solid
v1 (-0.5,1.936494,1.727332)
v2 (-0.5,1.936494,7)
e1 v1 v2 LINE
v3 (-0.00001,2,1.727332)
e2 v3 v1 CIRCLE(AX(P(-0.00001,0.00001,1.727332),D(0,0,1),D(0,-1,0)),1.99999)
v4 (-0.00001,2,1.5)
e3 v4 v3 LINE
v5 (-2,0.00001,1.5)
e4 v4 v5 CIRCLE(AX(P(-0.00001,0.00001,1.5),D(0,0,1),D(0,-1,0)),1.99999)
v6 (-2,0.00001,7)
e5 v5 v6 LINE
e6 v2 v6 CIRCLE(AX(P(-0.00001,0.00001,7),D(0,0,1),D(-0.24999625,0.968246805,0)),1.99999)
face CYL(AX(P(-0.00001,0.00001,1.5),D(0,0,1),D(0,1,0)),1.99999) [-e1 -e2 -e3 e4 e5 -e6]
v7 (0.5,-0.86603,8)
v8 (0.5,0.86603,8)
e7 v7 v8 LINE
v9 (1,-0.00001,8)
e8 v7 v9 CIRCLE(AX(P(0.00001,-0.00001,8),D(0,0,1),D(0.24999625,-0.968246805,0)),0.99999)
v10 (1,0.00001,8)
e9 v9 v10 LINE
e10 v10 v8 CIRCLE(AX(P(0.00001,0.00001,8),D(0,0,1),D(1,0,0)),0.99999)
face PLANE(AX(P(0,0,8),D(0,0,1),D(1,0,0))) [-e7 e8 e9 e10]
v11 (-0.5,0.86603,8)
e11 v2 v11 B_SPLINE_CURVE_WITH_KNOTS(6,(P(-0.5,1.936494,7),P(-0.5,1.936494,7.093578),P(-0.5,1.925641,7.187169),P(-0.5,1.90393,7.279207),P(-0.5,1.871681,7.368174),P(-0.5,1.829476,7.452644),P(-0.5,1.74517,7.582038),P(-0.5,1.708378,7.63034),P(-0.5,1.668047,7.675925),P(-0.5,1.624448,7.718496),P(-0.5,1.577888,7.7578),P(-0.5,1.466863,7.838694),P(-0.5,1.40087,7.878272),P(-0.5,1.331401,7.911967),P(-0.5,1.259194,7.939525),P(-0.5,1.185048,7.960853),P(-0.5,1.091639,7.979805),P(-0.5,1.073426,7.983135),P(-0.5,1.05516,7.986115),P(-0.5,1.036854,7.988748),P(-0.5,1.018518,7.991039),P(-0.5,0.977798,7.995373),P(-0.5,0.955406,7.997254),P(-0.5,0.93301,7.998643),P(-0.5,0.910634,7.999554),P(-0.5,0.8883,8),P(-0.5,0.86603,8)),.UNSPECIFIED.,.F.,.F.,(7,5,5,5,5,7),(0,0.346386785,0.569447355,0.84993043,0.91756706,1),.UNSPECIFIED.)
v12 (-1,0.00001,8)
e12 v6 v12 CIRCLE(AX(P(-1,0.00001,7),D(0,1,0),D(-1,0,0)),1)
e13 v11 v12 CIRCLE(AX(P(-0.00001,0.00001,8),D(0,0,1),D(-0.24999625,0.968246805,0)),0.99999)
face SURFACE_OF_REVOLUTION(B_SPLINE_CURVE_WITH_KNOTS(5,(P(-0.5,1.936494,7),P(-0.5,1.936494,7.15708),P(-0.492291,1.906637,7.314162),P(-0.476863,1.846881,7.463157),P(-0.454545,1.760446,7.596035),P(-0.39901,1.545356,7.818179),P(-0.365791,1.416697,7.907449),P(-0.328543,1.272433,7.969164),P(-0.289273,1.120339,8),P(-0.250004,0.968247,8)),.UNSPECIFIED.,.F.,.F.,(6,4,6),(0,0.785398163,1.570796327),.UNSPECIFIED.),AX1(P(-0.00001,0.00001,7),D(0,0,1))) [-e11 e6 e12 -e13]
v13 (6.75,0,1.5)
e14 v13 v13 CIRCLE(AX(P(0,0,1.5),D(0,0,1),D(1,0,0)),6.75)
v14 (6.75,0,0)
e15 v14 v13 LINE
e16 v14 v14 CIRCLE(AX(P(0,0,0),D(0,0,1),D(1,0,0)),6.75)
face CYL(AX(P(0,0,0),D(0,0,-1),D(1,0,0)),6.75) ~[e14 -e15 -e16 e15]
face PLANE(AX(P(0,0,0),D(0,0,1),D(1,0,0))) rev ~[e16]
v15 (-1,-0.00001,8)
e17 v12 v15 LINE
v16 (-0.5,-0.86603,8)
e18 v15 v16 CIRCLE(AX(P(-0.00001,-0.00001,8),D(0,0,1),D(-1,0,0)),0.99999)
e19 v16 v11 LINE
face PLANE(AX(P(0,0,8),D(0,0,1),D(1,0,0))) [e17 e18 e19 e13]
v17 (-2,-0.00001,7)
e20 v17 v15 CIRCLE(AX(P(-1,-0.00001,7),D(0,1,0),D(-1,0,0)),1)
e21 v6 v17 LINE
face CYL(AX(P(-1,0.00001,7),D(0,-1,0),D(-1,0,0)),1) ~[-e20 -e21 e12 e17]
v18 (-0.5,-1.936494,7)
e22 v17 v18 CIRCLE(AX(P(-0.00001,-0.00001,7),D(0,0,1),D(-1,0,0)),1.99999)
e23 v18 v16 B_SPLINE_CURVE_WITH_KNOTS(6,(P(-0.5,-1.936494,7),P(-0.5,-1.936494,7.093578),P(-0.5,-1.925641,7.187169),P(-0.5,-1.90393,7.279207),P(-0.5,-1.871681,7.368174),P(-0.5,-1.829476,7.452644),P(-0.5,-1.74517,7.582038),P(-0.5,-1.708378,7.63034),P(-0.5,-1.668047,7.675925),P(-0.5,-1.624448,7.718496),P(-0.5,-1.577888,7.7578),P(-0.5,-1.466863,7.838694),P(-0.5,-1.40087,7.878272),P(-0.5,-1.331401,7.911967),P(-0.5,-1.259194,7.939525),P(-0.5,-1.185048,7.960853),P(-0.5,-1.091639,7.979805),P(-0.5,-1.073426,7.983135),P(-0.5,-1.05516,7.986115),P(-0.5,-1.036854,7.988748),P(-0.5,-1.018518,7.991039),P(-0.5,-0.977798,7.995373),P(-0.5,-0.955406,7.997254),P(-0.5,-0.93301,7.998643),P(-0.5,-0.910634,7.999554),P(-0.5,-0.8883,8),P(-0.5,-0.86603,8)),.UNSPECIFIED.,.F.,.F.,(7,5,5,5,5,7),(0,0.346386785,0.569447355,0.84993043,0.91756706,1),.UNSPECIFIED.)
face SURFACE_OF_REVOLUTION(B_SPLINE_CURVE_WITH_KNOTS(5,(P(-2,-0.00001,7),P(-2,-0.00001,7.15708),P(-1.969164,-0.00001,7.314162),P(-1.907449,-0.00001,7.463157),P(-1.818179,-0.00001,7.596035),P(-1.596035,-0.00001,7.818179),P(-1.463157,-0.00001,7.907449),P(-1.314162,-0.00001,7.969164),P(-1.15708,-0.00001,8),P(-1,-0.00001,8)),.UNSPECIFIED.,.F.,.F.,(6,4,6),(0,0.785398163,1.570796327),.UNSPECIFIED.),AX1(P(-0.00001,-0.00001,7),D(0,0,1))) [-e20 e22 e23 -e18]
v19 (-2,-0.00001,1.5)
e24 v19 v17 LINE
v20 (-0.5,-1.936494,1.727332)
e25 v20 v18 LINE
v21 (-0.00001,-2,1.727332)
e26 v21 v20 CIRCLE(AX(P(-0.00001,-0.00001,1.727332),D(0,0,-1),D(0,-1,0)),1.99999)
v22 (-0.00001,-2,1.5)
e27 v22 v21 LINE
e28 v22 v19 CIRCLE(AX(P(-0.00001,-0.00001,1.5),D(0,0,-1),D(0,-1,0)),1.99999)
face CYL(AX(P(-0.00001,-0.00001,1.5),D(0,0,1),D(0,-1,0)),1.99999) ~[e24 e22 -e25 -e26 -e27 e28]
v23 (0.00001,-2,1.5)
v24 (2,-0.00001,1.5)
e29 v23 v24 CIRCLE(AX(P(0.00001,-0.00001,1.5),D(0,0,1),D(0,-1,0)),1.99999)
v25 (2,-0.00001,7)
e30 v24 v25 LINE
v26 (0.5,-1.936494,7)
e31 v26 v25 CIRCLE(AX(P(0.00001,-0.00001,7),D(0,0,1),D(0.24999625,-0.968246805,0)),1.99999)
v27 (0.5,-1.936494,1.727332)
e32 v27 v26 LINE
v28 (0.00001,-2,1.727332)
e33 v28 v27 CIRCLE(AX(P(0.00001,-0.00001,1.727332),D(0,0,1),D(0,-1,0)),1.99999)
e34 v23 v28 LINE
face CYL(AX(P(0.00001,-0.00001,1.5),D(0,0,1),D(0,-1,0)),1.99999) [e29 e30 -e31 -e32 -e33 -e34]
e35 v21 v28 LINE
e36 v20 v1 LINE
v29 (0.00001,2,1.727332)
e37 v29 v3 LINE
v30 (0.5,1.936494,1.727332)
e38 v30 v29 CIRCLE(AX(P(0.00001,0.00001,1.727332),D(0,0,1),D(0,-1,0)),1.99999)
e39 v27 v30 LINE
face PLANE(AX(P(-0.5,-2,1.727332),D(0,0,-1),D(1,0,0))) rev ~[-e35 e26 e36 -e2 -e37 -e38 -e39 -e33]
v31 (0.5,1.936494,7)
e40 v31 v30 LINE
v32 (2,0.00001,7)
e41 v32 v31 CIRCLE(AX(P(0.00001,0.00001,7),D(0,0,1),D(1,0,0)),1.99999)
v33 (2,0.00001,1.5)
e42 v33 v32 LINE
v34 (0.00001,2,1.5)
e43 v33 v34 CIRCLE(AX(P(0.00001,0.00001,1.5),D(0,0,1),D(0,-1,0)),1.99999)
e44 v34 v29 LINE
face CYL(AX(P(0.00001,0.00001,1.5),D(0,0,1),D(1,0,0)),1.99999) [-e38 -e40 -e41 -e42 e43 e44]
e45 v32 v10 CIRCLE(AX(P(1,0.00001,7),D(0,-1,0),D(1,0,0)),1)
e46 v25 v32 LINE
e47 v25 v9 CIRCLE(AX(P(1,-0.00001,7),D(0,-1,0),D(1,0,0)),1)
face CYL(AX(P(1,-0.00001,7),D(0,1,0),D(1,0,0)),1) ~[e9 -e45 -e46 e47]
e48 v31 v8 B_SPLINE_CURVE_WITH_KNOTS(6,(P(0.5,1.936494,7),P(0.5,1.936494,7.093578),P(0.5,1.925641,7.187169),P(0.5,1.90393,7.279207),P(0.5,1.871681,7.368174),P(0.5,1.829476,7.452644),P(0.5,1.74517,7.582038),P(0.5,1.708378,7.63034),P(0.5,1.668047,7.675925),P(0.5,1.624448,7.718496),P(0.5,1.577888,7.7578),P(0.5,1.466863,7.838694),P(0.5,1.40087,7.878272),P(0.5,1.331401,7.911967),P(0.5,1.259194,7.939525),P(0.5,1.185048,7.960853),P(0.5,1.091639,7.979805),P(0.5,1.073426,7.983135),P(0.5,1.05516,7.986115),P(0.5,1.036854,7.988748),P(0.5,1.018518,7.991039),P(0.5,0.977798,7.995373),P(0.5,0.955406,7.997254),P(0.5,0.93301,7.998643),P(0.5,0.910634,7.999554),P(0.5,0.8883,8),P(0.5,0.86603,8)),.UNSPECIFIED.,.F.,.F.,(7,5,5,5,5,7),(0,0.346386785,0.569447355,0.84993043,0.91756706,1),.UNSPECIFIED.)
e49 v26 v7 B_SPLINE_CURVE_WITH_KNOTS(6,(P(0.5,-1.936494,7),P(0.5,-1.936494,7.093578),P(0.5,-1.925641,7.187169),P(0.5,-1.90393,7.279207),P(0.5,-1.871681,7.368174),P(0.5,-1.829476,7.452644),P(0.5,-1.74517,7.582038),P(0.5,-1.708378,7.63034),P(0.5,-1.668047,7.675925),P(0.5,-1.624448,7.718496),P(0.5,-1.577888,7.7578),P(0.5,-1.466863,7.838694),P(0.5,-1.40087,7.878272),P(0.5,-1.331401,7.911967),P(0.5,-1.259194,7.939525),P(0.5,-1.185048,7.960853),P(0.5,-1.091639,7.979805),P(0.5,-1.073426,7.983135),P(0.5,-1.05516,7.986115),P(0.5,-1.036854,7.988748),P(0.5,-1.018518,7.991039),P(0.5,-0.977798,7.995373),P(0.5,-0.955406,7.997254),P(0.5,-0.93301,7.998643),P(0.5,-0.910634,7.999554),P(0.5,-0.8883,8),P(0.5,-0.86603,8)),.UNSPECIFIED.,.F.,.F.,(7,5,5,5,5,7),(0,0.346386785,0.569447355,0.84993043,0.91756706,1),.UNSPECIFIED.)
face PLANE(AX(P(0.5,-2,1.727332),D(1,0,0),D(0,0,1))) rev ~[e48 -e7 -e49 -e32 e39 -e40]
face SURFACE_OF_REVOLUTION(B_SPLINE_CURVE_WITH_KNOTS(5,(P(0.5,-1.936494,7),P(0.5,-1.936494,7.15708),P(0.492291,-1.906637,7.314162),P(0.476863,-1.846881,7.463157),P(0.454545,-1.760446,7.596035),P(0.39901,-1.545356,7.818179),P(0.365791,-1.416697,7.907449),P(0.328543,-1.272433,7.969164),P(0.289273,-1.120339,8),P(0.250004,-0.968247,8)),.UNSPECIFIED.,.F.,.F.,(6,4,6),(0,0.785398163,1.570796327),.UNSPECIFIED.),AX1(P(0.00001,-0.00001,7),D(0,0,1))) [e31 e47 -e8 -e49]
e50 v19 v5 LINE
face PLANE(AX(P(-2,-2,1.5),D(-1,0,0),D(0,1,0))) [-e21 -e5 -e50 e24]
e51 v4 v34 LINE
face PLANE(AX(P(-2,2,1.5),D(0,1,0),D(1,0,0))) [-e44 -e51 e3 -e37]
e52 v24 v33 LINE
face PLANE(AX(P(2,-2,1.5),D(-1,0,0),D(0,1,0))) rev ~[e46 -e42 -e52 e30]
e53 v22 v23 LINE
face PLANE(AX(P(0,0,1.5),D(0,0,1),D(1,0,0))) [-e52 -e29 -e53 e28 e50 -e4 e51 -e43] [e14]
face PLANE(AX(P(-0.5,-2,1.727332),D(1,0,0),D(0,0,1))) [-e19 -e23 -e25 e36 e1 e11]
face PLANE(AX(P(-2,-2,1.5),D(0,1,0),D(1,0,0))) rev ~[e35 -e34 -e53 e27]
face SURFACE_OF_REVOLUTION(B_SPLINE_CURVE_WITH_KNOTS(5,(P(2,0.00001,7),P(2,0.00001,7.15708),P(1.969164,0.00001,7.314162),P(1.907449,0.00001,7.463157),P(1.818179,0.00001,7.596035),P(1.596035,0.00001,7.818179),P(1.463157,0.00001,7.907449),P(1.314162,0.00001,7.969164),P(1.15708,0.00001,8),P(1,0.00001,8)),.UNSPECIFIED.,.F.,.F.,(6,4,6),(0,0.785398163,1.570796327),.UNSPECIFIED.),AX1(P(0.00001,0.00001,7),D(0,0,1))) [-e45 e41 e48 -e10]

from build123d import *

# Parameters (mm, degrees)
F0_R     = 6.75
F1_DEPTH = 1.5
F2_W     = 4
F2_H     = 4
F3_DEPTH = 6.5
F5_W     = 1
F5_H     = 6.2726680437
F6_DEPTH = 25
F7_R     = 1.99999
F8_R     = 1


# Not quite as in the source:
# - a fillet or chamfer is up to 0.001 mm smaller than in the source, because OpenCascade refuses the exact size


with BuildPart() as f1:
    # F0 (on Top) → F1 (new body)
    with BuildSketch(Plane.XY):
        Circle(F0_R)
    extrude(amount=F1_DEPTH)

    # F2 (on face) → F3 (join)
    with BuildSketch(Plane.XY.offset(1.5)):
        Rectangle(F2_W, F2_H)
    extrude(amount=F3_DEPTH)

    # F5 (on face) → F6 (cut)
    with BuildSketch(Plane.XZ.offset(2)):
        with Locations((0, 4.8636659781)):
            Rectangle(F5_W, F5_H)
    extrude(amount=-F6_DEPTH, mode=Mode.SUBTRACT)

    # F7 (radius 2 in the source; OpenCascade refuses exactly that, so slightly less here)
    f7_edges = [f1.edges().sort_by_distance(p)[0] for p in [
        (2, -2, 4.75),
        (2, 2, 4.75),
        (-2, 2, 4.75),
        (-2, -2, 4.75),
    ]]
    fillet(f7_edges, radius=F7_R)

    # F8
    f8_edges = [f1.edges().sort_by_distance(p)[0] for p in [
        (1.581139, 1.224752, 8),
        (-1.581139, 1.224752, 8),
    ]]
    fillet(f8_edges, radius=F8_R)


solid = f1.part
